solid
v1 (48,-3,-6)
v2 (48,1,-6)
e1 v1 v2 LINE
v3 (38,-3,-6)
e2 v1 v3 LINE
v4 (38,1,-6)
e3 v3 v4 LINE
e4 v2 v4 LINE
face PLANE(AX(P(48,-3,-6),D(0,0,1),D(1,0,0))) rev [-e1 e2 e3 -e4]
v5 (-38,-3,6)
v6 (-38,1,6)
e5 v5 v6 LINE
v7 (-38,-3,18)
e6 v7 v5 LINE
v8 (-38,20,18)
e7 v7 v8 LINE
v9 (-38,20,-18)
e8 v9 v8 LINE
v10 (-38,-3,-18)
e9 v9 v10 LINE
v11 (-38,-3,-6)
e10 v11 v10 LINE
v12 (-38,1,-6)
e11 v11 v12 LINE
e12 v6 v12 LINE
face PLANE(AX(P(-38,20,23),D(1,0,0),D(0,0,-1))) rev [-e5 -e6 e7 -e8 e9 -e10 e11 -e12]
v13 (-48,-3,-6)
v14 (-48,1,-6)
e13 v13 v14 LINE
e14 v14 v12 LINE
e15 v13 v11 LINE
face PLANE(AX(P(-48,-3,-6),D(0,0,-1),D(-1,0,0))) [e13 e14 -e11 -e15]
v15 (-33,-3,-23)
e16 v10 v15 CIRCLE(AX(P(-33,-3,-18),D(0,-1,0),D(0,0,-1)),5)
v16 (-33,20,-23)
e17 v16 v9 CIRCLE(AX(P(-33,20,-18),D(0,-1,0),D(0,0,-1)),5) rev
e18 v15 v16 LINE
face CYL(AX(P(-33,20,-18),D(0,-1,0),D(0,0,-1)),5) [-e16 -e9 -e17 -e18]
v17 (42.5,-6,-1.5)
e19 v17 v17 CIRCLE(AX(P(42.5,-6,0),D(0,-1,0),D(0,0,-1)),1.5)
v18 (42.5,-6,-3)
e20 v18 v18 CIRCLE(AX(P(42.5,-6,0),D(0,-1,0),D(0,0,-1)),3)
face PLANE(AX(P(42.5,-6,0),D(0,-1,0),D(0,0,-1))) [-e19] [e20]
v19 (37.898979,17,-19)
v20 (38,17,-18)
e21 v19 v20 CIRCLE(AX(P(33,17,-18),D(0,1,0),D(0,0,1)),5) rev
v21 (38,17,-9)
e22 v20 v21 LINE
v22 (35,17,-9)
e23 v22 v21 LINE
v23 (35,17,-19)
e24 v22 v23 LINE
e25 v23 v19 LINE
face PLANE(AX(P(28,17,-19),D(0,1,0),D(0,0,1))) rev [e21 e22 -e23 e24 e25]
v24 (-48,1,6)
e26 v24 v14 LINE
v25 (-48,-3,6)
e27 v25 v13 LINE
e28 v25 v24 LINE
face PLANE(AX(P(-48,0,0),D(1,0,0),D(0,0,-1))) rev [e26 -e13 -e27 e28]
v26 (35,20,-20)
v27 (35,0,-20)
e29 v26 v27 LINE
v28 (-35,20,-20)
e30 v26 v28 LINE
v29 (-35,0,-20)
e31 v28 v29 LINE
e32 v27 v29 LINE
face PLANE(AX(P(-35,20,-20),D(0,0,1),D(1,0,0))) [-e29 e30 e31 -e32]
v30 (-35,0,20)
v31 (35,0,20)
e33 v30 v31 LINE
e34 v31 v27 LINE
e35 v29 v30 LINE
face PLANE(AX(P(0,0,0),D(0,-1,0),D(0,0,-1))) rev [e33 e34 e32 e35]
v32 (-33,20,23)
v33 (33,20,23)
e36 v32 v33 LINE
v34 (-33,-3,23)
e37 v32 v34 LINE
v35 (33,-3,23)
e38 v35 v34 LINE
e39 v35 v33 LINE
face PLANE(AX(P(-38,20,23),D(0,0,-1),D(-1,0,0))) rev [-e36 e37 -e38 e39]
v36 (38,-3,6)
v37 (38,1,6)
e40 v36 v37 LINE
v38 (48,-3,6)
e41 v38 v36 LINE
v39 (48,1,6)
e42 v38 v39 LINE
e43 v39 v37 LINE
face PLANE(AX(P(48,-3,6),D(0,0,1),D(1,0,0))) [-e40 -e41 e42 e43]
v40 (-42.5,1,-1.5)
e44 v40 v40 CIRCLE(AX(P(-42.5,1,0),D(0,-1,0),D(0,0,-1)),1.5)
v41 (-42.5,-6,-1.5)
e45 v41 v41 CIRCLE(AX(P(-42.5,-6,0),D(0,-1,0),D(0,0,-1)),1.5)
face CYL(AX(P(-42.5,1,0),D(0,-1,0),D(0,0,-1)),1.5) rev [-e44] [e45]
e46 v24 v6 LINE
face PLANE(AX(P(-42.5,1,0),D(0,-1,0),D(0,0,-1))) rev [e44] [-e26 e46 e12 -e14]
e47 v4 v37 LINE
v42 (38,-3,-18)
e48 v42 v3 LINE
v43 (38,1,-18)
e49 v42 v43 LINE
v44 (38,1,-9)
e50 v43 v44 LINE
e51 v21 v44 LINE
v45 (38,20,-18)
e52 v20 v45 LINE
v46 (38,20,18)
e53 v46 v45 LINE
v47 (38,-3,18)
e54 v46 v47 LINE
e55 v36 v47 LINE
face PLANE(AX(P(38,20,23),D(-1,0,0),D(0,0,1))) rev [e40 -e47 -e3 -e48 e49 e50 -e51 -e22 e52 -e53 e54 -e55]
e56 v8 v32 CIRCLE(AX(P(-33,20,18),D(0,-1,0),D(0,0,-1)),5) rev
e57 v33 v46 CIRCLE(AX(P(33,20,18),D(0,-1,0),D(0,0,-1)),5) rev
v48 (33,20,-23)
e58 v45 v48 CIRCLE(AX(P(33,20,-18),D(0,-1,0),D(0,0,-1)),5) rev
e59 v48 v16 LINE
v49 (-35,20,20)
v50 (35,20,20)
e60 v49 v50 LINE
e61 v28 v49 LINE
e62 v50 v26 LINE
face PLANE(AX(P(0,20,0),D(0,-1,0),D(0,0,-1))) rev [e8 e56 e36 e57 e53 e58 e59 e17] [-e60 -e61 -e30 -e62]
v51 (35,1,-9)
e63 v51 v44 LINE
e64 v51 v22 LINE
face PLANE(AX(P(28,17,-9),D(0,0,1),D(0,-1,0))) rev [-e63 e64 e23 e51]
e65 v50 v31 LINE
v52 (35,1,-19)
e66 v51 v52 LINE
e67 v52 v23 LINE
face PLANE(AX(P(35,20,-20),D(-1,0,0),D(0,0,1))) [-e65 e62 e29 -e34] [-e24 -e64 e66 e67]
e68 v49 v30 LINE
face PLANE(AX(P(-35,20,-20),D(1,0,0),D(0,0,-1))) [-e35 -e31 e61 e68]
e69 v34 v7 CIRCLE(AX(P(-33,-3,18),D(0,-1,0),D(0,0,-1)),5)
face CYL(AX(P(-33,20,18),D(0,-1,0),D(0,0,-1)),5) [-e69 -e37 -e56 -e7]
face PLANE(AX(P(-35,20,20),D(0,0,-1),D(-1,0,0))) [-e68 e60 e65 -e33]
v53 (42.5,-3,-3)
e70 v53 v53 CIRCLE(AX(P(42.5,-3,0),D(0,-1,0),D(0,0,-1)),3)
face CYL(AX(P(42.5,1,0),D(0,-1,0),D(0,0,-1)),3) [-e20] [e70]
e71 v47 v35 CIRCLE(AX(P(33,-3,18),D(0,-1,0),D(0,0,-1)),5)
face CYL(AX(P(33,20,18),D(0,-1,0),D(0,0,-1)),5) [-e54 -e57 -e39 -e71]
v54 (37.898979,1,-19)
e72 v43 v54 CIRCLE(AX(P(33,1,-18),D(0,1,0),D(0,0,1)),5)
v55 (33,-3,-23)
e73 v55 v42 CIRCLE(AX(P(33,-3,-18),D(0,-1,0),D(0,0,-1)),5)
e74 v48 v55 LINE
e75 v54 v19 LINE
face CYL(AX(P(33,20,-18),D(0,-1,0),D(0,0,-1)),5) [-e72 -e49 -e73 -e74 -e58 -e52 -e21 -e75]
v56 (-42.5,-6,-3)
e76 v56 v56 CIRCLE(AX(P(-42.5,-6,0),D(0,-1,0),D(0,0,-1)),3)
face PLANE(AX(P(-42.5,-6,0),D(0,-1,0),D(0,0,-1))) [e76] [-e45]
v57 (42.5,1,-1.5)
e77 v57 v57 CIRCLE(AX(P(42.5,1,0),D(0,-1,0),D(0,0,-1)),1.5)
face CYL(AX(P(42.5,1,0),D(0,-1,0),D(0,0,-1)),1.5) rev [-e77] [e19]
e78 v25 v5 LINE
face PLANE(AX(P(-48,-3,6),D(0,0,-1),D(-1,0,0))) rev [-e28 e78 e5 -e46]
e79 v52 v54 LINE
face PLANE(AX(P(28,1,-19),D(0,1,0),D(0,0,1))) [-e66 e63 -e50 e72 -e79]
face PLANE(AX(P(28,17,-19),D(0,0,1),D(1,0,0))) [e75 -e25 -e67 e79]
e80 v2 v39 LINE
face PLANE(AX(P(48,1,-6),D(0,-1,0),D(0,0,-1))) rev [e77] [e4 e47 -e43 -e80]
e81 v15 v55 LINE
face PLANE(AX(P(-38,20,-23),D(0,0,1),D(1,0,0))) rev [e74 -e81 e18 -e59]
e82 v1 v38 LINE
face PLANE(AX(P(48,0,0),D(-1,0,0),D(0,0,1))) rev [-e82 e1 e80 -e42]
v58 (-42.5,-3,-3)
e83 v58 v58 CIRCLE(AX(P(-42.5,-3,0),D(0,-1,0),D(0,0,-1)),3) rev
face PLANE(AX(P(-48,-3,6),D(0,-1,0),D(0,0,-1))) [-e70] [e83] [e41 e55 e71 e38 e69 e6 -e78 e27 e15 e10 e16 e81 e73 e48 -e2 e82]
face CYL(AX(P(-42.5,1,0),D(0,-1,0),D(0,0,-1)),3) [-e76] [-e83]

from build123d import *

# Parameters (mm, degrees)
CROQUIS1_W                     = 76
CROQUIS1_H                     = 46
CROQUIS1_W_2                   = 70
CROQUIS1_H_2                   = 40
SALIENTE_EXTRUIR1_DEPTH        = 20
CROQUIS2_W                     = 76
CROQUIS2_H                     = 46
SALIENTE_EXTRUIR2_DEPTH        = 3
SALIENTE_EXTRUIR3_DEPTH        = 3
SALIENTE_EXTRUIR3_DEPTH_BACK   = 4
CROQUIS3_R                     = 3
CROQUIS3_R_2                   = 1.5
SALIENTE_EXTRUIR3_2_DEPTH      = 3
SALIENTE_EXTRUIR3_2_DEPTH_BACK = 4
CROQUIS4_W                     = 12
CROQUIS4_H                     = 4
SALIENTE_EXTRUIR4_DEPTH        = 10
CROQUIS5_W                     = 12
CROQUIS5_H                     = 4
SALIENTE_EXTRUIR5_DEPTH        = 10
CORTAR_EXTRUIR1_START          = -10
CROQUIS6_R                     = 1.5
CORTAR_EXTRUIR1_DEPTH          = 10
CROQUIS7_W                     = 10
CROQUIS7_H                     = 16
CORTAR_EXTRUIR2_DEPTH          = 10
REDONDEO1_R                    = 5


with BuildPart() as part:
    # Croquis1 → Saliente-Extruir1 (new body)
    with BuildSketch(Plane(origin=(0, 0, 0), x_dir=(1, 0, 0), z_dir=(0, 1, 0))):
        Rectangle(CROQUIS1_W, CROQUIS1_H)
        Rectangle(CROQUIS1_W_2, CROQUIS1_H_2, mode=Mode.SUBTRACT)
    extrude(amount=SALIENTE_EXTRUIR1_DEPTH)

    # Croquis2 → Saliente-Extruir2 (add)
    with BuildSketch(Plane.XZ):
        Rectangle(CROQUIS2_W, CROQUIS2_H)
    extrude(amount=SALIENTE_EXTRUIR2_DEPTH)



with BuildPart() as body_2:
    # Croquis3 → Saliente-Extruir3 (new, two sides: drawn at the far end of the back side and taken through both)
    with BuildSketch(Plane.XZ.offset(3).offset(-SALIENTE_EXTRUIR3_DEPTH_BACK)):
        with Locations(Location((42.5, 0, 0), (0, 0, 270))):
            Circle(CROQUIS3_R)
        with Locations(Location((42.5, 0, 0), (0, 0, 270))):
            Circle(CROQUIS3_R_2, mode=Mode.SUBTRACT)
    extrude(amount=SALIENTE_EXTRUIR3_DEPTH + SALIENTE_EXTRUIR3_DEPTH_BACK)


with BuildPart() as body_3:
    # Croquis3 → Saliente-Extruir3 2 (new, two sides: drawn at the far end of the back side and taken through both)
    with BuildSketch(Plane.XZ.offset(3).offset(-SALIENTE_EXTRUIR3_2_DEPTH_BACK)):
        with Locations(Location((-42.5, 0, 0), (0, 0, 270))):
            Circle(CROQUIS3_R)
        with Locations(Location((-42.5, 0, 0), (0, 0, 270))):
            Circle(CROQUIS3_R_2, mode=Mode.SUBTRACT)
    extrude(amount=SALIENTE_EXTRUIR3_2_DEPTH + SALIENTE_EXTRUIR3_2_DEPTH_BACK)


with BuildPart() as part_1:
    add(part.part)

    add(body_2.part)  # Saliente-Extruir4 merges body 2
    # Croquis4 → Saliente-Extruir4 (add)
    with BuildSketch(Plane(origin=(38, 0, 0), x_dir=(0, 0, -1), z_dir=(1, 0, 0))):
        with Locations((0, -1)):
            Rectangle(CROQUIS4_W, CROQUIS4_H)
    extrude(amount=SALIENTE_EXTRUIR4_DEPTH)


    add(body_3.part)  # Saliente-Extruir5 merges body 3
    # Croquis5 → Saliente-Extruir5 (add)
    with BuildSketch(Plane.ZY.offset(38)):
        with Locations((0, -1)):
            Rectangle(CROQUIS5_W, CROQUIS5_H)
    extrude(amount=SALIENTE_EXTRUIR5_DEPTH)

    # Croquis6 → Cortar-Extruir1 (cut)
    with BuildSketch(Plane.XZ.offset(3).offset(CORTAR_EXTRUIR1_START)):
        with Locations(Location((-42.5, 0, 0), (0, 0, 270))):
            Circle(CROQUIS6_R)
        with Locations(Location((42.5, 0, 0), (0, 0, 270))):
            Circle(CROQUIS6_R)
    extrude(amount=CORTAR_EXTRUIR1_DEPTH, mode=Mode.SUBTRACT)

    # Croquis7 → Cortar-Extruir2 (cut)
    with BuildSketch(Plane(origin=(38, 0, 0), x_dir=(0, 0, -1), z_dir=(1, 0, 0))):
        with Locations((14, 9)):
            Rectangle(CROQUIS7_W, CROQUIS7_H)
    extrude(amount=-CORTAR_EXTRUIR2_DEPTH, mode=Mode.SUBTRACT)

    # Redondeo1
    # the kernel refuses this fillet: 5 mm, written as the material it takes off along each edge
    with BuildSketch(Plane(origin=(-38, 32.5, 23), x_dir=(1, 0, 0), z_dir=(0, -1, 0)), Plane(origin=(-38, 32.5, -23), x_dir=(0, 0, 1), z_dir=(0, -1, 0)), Plane(origin=(38, -15.5, -23), x_dir=(0, 0, 1), z_dir=(0, 1, 0)), Plane(origin=(38, -15.5, 23), x_dir=(-1, 0, 0), z_dir=(0, 1, 0))) as redondeo1_piece_1:
        with BuildLine():
            CenterArc((REDONDEO1_R, -REDONDEO1_R), REDONDEO1_R, 90, 90)
            Line((0, -REDONDEO1_R), (0, 0))
            Line((0, 0), (REDONDEO1_R, 0))
        make_face()
    extrude(amount=48, mode=Mode.SUBTRACT)


solid = part_1.part
